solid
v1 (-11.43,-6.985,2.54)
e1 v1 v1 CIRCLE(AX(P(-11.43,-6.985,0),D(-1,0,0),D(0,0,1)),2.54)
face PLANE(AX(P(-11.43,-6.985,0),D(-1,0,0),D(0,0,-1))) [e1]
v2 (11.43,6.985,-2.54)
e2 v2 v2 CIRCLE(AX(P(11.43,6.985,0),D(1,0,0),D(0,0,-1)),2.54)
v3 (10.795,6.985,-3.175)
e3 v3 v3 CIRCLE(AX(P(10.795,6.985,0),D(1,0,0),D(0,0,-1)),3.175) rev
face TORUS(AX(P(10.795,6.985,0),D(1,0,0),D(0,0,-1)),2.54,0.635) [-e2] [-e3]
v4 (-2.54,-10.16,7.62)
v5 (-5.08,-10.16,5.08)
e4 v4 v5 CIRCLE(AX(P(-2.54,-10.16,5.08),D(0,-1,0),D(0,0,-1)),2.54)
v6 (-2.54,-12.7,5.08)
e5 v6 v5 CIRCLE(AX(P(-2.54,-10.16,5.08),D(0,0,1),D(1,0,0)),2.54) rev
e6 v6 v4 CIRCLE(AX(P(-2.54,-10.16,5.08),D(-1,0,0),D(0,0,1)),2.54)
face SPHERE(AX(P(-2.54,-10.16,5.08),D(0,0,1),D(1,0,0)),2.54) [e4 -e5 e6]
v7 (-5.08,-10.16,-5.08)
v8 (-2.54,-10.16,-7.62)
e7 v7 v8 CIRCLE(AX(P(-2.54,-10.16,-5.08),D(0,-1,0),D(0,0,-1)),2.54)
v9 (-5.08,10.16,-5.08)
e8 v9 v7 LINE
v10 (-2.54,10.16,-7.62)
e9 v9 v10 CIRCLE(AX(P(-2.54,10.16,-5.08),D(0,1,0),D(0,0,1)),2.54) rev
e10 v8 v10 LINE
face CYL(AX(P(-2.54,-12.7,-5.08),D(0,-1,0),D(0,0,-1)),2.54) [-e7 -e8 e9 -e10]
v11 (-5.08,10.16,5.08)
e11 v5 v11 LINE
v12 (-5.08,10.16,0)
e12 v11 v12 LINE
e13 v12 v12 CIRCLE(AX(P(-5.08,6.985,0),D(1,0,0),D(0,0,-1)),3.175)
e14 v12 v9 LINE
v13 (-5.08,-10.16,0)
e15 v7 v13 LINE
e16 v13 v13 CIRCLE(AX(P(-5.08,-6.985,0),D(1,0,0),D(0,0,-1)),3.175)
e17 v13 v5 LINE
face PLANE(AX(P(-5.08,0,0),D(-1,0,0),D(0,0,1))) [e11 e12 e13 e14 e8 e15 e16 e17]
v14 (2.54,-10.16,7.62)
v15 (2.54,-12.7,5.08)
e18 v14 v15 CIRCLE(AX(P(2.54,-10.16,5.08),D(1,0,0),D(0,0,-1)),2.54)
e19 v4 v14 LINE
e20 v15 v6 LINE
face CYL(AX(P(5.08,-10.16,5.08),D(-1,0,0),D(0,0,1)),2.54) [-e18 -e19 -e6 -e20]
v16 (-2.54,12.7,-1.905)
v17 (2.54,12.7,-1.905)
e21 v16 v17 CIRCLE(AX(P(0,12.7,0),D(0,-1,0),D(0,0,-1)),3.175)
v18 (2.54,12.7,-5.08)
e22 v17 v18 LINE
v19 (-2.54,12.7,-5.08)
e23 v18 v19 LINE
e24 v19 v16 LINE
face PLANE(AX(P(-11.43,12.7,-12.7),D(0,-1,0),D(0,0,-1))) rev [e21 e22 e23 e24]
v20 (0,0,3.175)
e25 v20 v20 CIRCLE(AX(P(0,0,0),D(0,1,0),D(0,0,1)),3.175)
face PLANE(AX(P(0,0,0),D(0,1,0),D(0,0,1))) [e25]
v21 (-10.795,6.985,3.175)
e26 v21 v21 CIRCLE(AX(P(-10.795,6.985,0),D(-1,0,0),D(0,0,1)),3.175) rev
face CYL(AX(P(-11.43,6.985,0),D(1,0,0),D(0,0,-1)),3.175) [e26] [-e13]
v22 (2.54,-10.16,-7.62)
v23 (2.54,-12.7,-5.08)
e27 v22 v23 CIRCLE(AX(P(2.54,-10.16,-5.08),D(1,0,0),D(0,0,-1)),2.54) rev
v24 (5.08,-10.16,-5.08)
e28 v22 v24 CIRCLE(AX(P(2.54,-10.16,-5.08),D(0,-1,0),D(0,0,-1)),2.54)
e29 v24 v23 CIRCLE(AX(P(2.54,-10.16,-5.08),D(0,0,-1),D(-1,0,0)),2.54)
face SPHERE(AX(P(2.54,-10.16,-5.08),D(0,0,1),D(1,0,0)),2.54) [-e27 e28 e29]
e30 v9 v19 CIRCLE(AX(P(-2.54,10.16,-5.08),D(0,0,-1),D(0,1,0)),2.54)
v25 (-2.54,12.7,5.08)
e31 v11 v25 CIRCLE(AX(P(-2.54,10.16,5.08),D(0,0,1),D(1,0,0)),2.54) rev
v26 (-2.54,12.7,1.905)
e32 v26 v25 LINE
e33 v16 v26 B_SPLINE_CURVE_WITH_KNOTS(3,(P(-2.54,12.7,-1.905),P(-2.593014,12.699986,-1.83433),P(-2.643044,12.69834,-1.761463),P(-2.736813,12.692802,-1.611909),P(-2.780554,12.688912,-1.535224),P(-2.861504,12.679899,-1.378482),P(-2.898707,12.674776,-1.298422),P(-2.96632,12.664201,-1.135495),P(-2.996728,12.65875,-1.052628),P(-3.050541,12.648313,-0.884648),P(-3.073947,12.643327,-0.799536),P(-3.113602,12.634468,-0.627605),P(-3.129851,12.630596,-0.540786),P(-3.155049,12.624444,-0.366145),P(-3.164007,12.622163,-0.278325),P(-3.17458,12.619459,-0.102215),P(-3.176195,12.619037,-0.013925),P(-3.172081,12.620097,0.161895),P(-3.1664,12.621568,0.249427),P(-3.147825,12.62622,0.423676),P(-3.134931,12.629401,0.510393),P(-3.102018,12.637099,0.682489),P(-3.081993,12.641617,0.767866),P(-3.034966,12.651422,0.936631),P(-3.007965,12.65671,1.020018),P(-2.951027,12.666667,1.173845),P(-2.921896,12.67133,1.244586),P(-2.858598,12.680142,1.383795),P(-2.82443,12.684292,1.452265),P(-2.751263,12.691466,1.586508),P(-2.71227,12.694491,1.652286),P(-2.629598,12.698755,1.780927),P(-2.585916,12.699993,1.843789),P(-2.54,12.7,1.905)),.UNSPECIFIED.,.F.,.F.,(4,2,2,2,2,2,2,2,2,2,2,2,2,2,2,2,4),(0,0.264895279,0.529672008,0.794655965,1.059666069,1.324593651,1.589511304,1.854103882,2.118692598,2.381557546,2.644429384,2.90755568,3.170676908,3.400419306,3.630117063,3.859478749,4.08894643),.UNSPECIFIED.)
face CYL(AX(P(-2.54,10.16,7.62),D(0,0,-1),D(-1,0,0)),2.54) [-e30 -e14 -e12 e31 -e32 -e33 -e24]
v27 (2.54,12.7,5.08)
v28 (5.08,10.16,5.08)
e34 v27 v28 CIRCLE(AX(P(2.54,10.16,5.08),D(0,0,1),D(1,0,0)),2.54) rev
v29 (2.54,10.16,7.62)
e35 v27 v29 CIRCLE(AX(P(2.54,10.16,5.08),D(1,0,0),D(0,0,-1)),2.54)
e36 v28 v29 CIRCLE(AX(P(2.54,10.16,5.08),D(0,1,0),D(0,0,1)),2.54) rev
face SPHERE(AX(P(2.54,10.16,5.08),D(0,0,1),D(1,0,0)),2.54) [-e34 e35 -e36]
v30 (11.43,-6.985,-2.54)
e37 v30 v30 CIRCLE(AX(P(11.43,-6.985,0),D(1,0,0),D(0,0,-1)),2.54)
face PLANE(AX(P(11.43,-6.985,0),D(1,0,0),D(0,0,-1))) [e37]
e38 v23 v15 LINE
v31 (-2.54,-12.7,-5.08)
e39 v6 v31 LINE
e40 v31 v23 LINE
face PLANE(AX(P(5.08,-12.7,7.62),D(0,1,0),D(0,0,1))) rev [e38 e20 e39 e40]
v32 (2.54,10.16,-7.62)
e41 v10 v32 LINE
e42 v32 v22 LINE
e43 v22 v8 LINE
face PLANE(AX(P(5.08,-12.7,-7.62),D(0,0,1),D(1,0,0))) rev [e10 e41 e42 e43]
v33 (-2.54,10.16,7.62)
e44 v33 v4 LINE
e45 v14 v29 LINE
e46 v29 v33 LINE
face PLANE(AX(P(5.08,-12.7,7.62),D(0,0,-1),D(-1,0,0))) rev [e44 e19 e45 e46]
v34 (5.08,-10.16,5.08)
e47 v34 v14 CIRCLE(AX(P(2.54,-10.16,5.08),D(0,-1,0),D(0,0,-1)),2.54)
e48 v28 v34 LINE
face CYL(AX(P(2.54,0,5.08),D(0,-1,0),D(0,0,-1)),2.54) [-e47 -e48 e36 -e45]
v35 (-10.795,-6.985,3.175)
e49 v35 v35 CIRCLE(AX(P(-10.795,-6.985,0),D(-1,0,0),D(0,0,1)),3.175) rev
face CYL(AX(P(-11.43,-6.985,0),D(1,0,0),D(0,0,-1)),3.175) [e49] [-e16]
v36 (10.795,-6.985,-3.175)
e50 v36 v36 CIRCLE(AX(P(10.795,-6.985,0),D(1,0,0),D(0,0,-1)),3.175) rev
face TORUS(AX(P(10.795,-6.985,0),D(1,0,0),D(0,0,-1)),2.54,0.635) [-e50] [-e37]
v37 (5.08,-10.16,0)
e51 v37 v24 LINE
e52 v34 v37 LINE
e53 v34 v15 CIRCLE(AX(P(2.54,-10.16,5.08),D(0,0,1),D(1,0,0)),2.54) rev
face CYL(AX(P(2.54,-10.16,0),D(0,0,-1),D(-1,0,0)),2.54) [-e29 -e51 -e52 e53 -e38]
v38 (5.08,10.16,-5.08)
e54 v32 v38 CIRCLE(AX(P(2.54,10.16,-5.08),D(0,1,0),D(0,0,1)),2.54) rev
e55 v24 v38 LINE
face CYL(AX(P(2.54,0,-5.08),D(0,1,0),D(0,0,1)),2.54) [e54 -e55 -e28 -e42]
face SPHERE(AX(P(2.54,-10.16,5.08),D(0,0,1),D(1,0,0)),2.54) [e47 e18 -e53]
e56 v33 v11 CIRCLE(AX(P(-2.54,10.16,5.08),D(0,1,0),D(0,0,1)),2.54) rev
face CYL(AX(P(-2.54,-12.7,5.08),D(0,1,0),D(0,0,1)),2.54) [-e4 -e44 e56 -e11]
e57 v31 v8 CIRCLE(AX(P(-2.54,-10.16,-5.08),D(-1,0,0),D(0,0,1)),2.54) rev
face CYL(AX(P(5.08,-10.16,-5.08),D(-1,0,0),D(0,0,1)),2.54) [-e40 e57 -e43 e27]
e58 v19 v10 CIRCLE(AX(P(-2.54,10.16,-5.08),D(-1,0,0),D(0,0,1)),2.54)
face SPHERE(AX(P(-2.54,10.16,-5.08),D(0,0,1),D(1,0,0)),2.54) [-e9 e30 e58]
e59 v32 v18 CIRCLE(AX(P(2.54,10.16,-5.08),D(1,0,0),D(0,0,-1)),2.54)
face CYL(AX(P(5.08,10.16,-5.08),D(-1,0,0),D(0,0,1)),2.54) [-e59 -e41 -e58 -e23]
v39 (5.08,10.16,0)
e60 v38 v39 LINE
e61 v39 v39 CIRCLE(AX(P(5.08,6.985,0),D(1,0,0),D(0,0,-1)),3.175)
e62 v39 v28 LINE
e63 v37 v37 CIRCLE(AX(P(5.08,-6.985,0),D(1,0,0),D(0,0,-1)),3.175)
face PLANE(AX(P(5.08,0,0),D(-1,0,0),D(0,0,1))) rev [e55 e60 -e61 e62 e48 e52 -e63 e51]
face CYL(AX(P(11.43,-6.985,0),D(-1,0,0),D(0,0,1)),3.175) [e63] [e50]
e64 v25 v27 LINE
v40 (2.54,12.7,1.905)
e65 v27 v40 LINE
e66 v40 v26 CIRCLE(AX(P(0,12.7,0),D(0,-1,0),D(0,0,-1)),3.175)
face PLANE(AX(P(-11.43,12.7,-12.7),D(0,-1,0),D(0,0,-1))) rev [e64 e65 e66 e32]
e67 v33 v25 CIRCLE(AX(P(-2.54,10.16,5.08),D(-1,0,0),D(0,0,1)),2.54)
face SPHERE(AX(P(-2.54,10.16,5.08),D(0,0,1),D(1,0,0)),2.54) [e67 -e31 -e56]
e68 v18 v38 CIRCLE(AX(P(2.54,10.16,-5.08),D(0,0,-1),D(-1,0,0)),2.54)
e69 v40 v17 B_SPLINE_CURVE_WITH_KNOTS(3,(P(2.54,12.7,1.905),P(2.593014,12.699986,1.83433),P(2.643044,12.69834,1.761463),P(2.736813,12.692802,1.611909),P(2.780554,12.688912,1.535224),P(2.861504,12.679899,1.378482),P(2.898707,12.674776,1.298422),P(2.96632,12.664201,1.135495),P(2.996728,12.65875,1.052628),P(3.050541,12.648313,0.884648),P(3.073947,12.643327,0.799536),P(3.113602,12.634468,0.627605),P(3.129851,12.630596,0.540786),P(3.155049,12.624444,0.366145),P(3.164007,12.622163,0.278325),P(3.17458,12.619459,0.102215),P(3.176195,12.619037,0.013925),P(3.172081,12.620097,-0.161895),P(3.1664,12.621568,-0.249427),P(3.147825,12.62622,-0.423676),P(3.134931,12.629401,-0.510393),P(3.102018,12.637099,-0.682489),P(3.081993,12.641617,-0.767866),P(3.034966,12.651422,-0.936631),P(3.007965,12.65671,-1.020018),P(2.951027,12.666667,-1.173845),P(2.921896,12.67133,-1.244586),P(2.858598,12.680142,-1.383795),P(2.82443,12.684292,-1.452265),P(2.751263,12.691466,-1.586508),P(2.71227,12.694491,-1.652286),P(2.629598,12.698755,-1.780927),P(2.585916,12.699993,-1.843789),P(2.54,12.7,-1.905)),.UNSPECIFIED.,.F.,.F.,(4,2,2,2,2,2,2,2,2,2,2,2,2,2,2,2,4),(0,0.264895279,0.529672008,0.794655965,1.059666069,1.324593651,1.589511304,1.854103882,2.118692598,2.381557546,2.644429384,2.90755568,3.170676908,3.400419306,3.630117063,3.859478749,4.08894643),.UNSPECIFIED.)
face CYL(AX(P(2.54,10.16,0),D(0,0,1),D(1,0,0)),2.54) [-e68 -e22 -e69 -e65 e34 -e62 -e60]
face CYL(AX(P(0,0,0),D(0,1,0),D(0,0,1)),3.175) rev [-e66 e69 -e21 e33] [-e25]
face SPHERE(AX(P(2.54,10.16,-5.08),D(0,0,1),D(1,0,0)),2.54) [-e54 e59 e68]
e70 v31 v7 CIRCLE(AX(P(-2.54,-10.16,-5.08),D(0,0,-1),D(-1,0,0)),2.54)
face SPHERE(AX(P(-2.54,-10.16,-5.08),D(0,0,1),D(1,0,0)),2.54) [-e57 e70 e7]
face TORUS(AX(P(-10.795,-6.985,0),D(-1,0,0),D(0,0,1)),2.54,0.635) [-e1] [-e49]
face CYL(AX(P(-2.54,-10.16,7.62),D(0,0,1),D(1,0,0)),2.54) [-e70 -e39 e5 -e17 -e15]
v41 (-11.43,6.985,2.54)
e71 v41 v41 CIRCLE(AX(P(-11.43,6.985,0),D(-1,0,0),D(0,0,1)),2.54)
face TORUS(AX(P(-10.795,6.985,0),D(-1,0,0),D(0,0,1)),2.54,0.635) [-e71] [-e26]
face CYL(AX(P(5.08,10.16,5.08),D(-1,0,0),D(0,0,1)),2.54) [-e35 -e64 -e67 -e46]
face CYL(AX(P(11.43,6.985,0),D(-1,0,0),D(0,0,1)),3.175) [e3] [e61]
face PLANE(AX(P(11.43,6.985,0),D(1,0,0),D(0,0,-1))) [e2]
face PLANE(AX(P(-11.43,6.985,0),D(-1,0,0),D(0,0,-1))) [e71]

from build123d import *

# Parameters (mm, degrees)
SKETCH1_W           = 15.24
SKETCH1_H           = 25.4
BOSS_EXTRUDE1_DEPTH = 5.08
FILLET1_R           = 2.54
SKETCH2_R           = 3.175
BOSS_EXTRUDE2_DEPTH = 6.35
SKETCH3_W           = 5.08
SKETCH3_H           = 10.16
BOSS_EXTRUDE3_DEPTH = 5.08
SKETCH4_W           = 7.62
SKETCH4_H           = 12.7
BOSS_EXTRUDE4_DEPTH = 25.4
FILLET2_R           = 2.54
FILLET3_R           = 3.81
SKETCH5_R           = 1.905
BOSS_EXTRUDE5_DEPTH = 1.27
BOSS_EXTRUDE6_DEPTH = 25.4
FILLET4_R           = 1.27
SKETCH7_W           = 5.588
SKETCH7_H           = 21.59
CUT_EXTRUDE1_DEPTH  = 1.016
FILLET5_R           = 0.254
CUT_EXTRUDE2_REACH  = 52.512
SKETCH8_R           = 4.445
FILLET6_R           = 0.635
SKETCH9_W           = 25.4
SKETCH9_H           = 50.8
CUT_EXTRUDE3_DEPTH  = 22.86
SKETCH10_R          = 3.175
CUT_EXTRUDE4_DEPTH  = 12.7


# Some blends are built 0.0001 mm under size
with BuildPart() as part:
    # Sketch1 → Boss-Extrude1 (new, symmetric)
    with BuildSketch(Plane(origin=(0, 0, 0), x_dir=(0, 0, -1), z_dir=(1, 0, 0))):
        Rectangle(SKETCH1_W, SKETCH1_H)
    extrude(amount=BOSS_EXTRUDE1_DEPTH, both=True)

    # Fillet1
    fillet1_edges = [part.edges().sort_by_distance(p)[0] for p in [
        (5.08, 0, 7.62),
        (5.08, -12.7, 0),
        (5.08, 0, -7.62),
        (-5.08, -12.7, 0),
        (-5.08, 0, 7.62),
        (-5.08, 12.7, 0),
        (-5.08, 0, -7.62),
        (5.08, 12.7, 0),
        (0, -12.7, -7.62),
        (0, -12.7, 7.62),
        (0, 12.7, 7.62),
        (0, 12.7, -7.62),
    ]]
    fillet(fillet1_edges, radius=FILLET1_R)

    # Sketch2 → Boss-Extrude2 (add)
    with BuildSketch(Plane(origin=(5.08, 0, 0), x_dir=(0, 0, -1), z_dir=(1, 0, 0))):
        with Locations(Location((0, 6.985, 0), (0, 0, 90))):
            Circle(SKETCH2_R)
        with Locations(Location((0, -6.985, 0), (0, 0, 270))):
            Circle(SKETCH2_R)
    boss_extrude2 = extrude(amount=BOSS_EXTRUDE2_DEPTH)

    # Mirror1: Boss-Extrude2 across plane
    add(boss_extrude2.mirror(Plane(origin=(0, 0, 0), x_dir=(0, 0, 1), z_dir=(1, 0, 0))))

    # Sketch3 → Boss-Extrude3 (add)
    with BuildSketch(Plane(origin=(0, 12.7, 0), x_dir=(1, 0, 0), z_dir=(0, 1, 0))):
        Rectangle(SKETCH3_W, SKETCH3_H)
    extrude(amount=BOSS_EXTRUDE3_DEPTH)

    # Sketch4 → Boss-Extrude4 (add)
    with BuildSketch(Plane(origin=(0, 17.78, 0), x_dir=(1, 0, 0), z_dir=(0, 1, 0))):
        Rectangle(SKETCH4_W, SKETCH4_H)
    extrude(amount=BOSS_EXTRUDE4_DEPTH)

    # Fillet2
    # the kernel refuses this fillet: 2.54 mm, written as the material it takes off along each edge
    with BuildSketch(Plane(origin=(10.16, 17.78, -6.35), x_dir=(0, 0, 1), z_dir=(-1, 0, 0))) as fillet2_piece_1_section:
        with BuildLine():
            CenterArc((FILLET2_R, FILLET2_R), FILLET2_R, 180, 90)
            Line((0, FILLET2_R), (0, 0))
            Line((0, 0), (FILLET2_R, 0))
        make_face()
    fillet2_piece_1 = extrude(amount=20.32, mode=Mode.PRIVATE)
    fillet2_piece_1 = split(fillet2_piece_1, bisect_by=Plane(origin=(6.35, 17.840981289, -5.08), z_dir=(0, 0, 1)), keep=Keep.TOP, mode=Mode.PRIVATE)
    fillet2_piece_1 = split(fillet2_piece_1, bisect_by=Plane(origin=(2.54, 17.840981289, -4.665343007), z_dir=(1, 0, 0)), keep=Keep.TOP, mode=Mode.PRIVATE)
    add(fillet2_piece_1, mode=Mode.SUBTRACT)
    with BuildSketch(Plane(origin=(10.16, 17.78, -6.35), x_dir=(0, 0, 1), z_dir=(-1, 0, 0))) as fillet2_piece_2_section:
        with BuildLine():
            CenterArc((FILLET2_R, FILLET2_R), FILLET2_R, 180, 90)
            Line((0, FILLET2_R), (0, 0))
            Line((0, 0), (FILLET2_R, 0))
        make_face()
    fillet2_piece_2 = extrude(amount=20.32, mode=Mode.PRIVATE)
    fillet2_piece_2 = split(fillet2_piece_2, bisect_by=Plane(origin=(6.35, 18.428004952, -5.08), z_dir=(0, 0, -1)), keep=Keep.TOP, mode=Mode.PRIVATE)
    fillet2_piece_2 = split(fillet2_piece_2, bisect_by=Plane(origin=(2.54, 18.428004952, -5.932444919), z_dir=(1, 0, 0)), keep=Keep.TOP, mode=Mode.PRIVATE)
    add(fillet2_piece_2, mode=Mode.SUBTRACT)
    with BuildSketch(Plane(origin=(10.16, 17.78, -6.35), x_dir=(0, 0, 1), z_dir=(-1, 0, 0))) as fillet2_piece_3_section:
        with BuildLine():
            CenterArc((FILLET2_R, FILLET2_R), FILLET2_R, 180, 90)
            Line((0, FILLET2_R), (0, 0))
            Line((0, 0), (FILLET2_R, 0))
        make_face()
    fillet2_piece_3 = extrude(amount=20.32, mode=Mode.PRIVATE)
    fillet2_piece_3 = split(fillet2_piece_3, bisect_by=Plane(origin=(0, 18.428004952, -5.08), z_dir=(0, 0, -1)), keep=Keep.TOP, mode=Mode.PRIVATE)
    fillet2_piece_3 = split(fillet2_piece_3, bisect_by=Plane(origin=(-2.54, 18.428004952, -5.932444919), z_dir=(1, 0, 0)), keep=Keep.TOP, mode=Mode.PRIVATE)
    fillet2_piece_3 = split(fillet2_piece_3, bisect_by=Plane(origin=(2.54, 18.428004952, -5.932444919), z_dir=(-1, 0, 0)), keep=Keep.TOP, mode=Mode.PRIVATE)
    add(fillet2_piece_3, mode=Mode.SUBTRACT)
    with BuildSketch(Plane(origin=(10.16, 17.78, -6.35), x_dir=(0, 0, 1), z_dir=(-1, 0, 0))) as fillet2_piece_4_section:
        with BuildLine():
            CenterArc((FILLET2_R, FILLET2_R), FILLET2_R, 180, 90)
            Line((0, FILLET2_R), (0, 0))
            Line((0, 0), (FILLET2_R, 0))
        make_face()
    fillet2_piece_4 = extrude(amount=20.32, mode=Mode.PRIVATE)
    fillet2_piece_4 = split(fillet2_piece_4, bisect_by=Plane(origin=(-6.35, 17.840981289, -5.08), z_dir=(0, 0, 1)), keep=Keep.TOP, mode=Mode.PRIVATE)
    fillet2_piece_4 = split(fillet2_piece_4, bisect_by=Plane(origin=(-2.54, 17.840981289, -4.665343007), z_dir=(-1, 0, 0)), keep=Keep.TOP, mode=Mode.PRIVATE)
    add(fillet2_piece_4, mode=Mode.SUBTRACT)
    with BuildSketch(Plane(origin=(10.16, 17.78, -6.35), x_dir=(0, 0, 1), z_dir=(-1, 0, 0))) as fillet2_piece_5_section:
        with BuildLine():
            CenterArc((FILLET2_R, FILLET2_R), FILLET2_R, 180, 90)
            Line((0, FILLET2_R), (0, 0))
            Line((0, 0), (FILLET2_R, 0))
        make_face()
    fillet2_piece_5 = extrude(amount=20.32, mode=Mode.PRIVATE)
    fillet2_piece_5 = split(fillet2_piece_5, bisect_by=Plane(origin=(-6.35, 18.428004952, -5.08), z_dir=(0, 0, -1)), keep=Keep.TOP, mode=Mode.PRIVATE)
    fillet2_piece_5 = split(fillet2_piece_5, bisect_by=Plane(origin=(-2.54, 18.428004952, -5.932444919), z_dir=(-1, 0, 0)), keep=Keep.TOP, mode=Mode.PRIVATE)
    add(fillet2_piece_5, mode=Mode.SUBTRACT)
    with BuildSketch(Plane(origin=(-10.16, 17.78, 6.35), x_dir=(0, 1, 0), z_dir=(1, 0, 0))) as fillet2_piece_6_section:
        with BuildLine():
            CenterArc((FILLET2_R, -FILLET2_R), FILLET2_R, 90, 90)
            Line((0, -FILLET2_R), (0, 0))
            Line((0, 0), (FILLET2_R, 0))
        make_face()
    fillet2_piece_6 = extrude(amount=20.32, mode=Mode.PRIVATE)
    fillet2_piece_6 = split(fillet2_piece_6, bisect_by=Plane(origin=(-2.54, 18.428004952, 5.932444919), z_dir=(-1, 0, 0)), keep=Keep.TOP, mode=Mode.PRIVATE)
    fillet2_piece_6 = split(fillet2_piece_6, bisect_by=Plane(origin=(-6.35, 18.428004952, 5.08), z_dir=(0, 0, 1)), keep=Keep.TOP, mode=Mode.PRIVATE)
    add(fillet2_piece_6, mode=Mode.SUBTRACT)
    with BuildSketch(Plane(origin=(-10.16, 17.78, 6.35), x_dir=(0, 1, 0), z_dir=(1, 0, 0))) as fillet2_piece_7_section:
        with BuildLine():
            CenterArc((FILLET2_R, -FILLET2_R), FILLET2_R, 90, 90)
            Line((0, -FILLET2_R), (0, 0))
            Line((0, 0), (FILLET2_R, 0))
        make_face()
    fillet2_piece_7 = extrude(amount=20.32, mode=Mode.PRIVATE)
    fillet2_piece_7 = split(fillet2_piece_7, bisect_by=Plane(origin=(-2.54, 17.840981289, 4.665343007), z_dir=(-1, 0, 0)), keep=Keep.TOP, mode=Mode.PRIVATE)
    fillet2_piece_7 = split(fillet2_piece_7, bisect_by=Plane(origin=(-6.35, 17.840981289, 5.08), z_dir=(0, 0, -1)), keep=Keep.TOP, mode=Mode.PRIVATE)
    add(fillet2_piece_7, mode=Mode.SUBTRACT)
    with BuildSketch(Plane(origin=(-10.16, 17.78, 6.35), x_dir=(0, 1, 0), z_dir=(1, 0, 0))) as fillet2_piece_8_section:
        with BuildLine():
            CenterArc((FILLET2_R, -FILLET2_R), FILLET2_R, 90, 90)
            Line((0, -FILLET2_R), (0, 0))
            Line((0, 0), (FILLET2_R, 0))
        make_face()
    fillet2_piece_8 = extrude(amount=20.32, mode=Mode.PRIVATE)
    fillet2_piece_8 = split(fillet2_piece_8, bisect_by=Plane(origin=(-2.54, 18.428004952, 5.932444919), z_dir=(1, 0, 0)), keep=Keep.TOP, mode=Mode.PRIVATE)
    fillet2_piece_8 = split(fillet2_piece_8, bisect_by=Plane(origin=(0, 18.428004952, 5.08), z_dir=(0, 0, 1)), keep=Keep.TOP, mode=Mode.PRIVATE)
    fillet2_piece_8 = split(fillet2_piece_8, bisect_by=Plane(origin=(2.54, 18.428004952, 5.932444919), z_dir=(-1, 0, 0)), keep=Keep.TOP, mode=Mode.PRIVATE)
    add(fillet2_piece_8, mode=Mode.SUBTRACT)
    with BuildSketch(Plane(origin=(-10.16, 17.78, 6.35), x_dir=(0, 1, 0), z_dir=(1, 0, 0))) as fillet2_piece_9_section:
        with BuildLine():
            CenterArc((FILLET2_R, -FILLET2_R), FILLET2_R, 90, 90)
            Line((0, -FILLET2_R), (0, 0))
            Line((0, 0), (FILLET2_R, 0))
        make_face()
    fillet2_piece_9 = extrude(amount=20.32, mode=Mode.PRIVATE)
    fillet2_piece_9 = split(fillet2_piece_9, bisect_by=Plane(origin=(6.35, 18.428004952, 5.08), z_dir=(0, 0, 1)), keep=Keep.TOP, mode=Mode.PRIVATE)
    fillet2_piece_9 = split(fillet2_piece_9, bisect_by=Plane(origin=(2.54, 18.428004952, 5.932444919), z_dir=(1, 0, 0)), keep=Keep.TOP, mode=Mode.PRIVATE)
    add(fillet2_piece_9, mode=Mode.SUBTRACT)
    with BuildSketch(Plane(origin=(-10.16, 17.78, 6.35), x_dir=(0, 1, 0), z_dir=(1, 0, 0))) as fillet2_piece_10_section:
        with BuildLine():
            CenterArc((FILLET2_R, -FILLET2_R), FILLET2_R, 90, 90)
            Line((0, -FILLET2_R), (0, 0))
            Line((0, 0), (FILLET2_R, 0))
        make_face()
    fillet2_piece_10 = extrude(amount=20.32, mode=Mode.PRIVATE)
    fillet2_piece_10 = split(fillet2_piece_10, bisect_by=Plane(origin=(6.35, 17.840981289, 5.08), z_dir=(0, 0, -1)), keep=Keep.TOP, mode=Mode.PRIVATE)
    fillet2_piece_10 = split(fillet2_piece_10, bisect_by=Plane(origin=(2.54, 17.840981289, 4.665343007), z_dir=(1, 0, 0)), keep=Keep.TOP, mode=Mode.PRIVATE)
    add(fillet2_piece_10, mode=Mode.SUBTRACT)

    # Fillet3
    fillet3_edges = [part.edges().sort_by_distance(p)[0] for p in [
        (3.81, 43.18, 0),
        (0, 43.18, -6.35),
        (-3.81, 43.18, 0),
        (0, 43.18, 6.35),
    ]]
    fillet(fillet3_edges, radius=FILLET3_R - 0.0001)  # a hair under: the kernel refuses the full size

    # Sketch5 → Boss-Extrude5 (add)
    with BuildSketch(Plane(origin=(0, 0, -6.35), x_dir=(-1, 0, 0), z_dir=(0, 0, -1))):
        with Locations(Location((0, 32.385, 0), (0, 0, 180))):
            Circle(SKETCH5_R)
        with Locations(Location((0, 25.4, 0), (0, 0, 180))):
            Circle(SKETCH5_R)
    extrude(amount=BOSS_EXTRUDE5_DEPTH)

    # Sketch6 → Boss-Extrude6 (add)
    with BuildSketch(Plane(origin=(0, 21.59, 0), x_dir=(1, 0, 0), z_dir=(0, 1, 0))):
        with BuildLine():
            Line((-3.81, 10.541), (3.81, 10.541))
            ThreePointArc((3.81, 10.541), (5.588, 8.763), (3.81, 6.985))
            Line((3.81, 6.985), (-3.81, 6.985))
            ThreePointArc((-3.81, 6.985), (-5.588, 8.763), (-3.81, 10.541))
        make_face()
    extrude(amount=BOSS_EXTRUDE6_DEPTH)

    # Fillet4
    fillet4_edges = [part.edges().sort_by_distance(p)[0] for p in [
        (0, 21.59, -6.985),
        (-5.588, 21.59, -8.763),
        (5.588, 21.59, -8.763),
        (0, 21.59, -10.541),
        (-5.588, 46.99, -8.763),
        (0, 46.99, -6.985),
        (5.588, 46.99, -8.763),
        (0, 46.99, -10.541),
    ]]
    fillet(fillet4_edges, radius=FILLET4_R)

    # Sketch7 → Cut-Extrude1 (cut)
    with BuildSketch(Plane(origin=(0, 0, -10.541), x_dir=(-1, 0, 0), z_dir=(0, 0, -1))):
        with Locations((0, 34.29)):
            Rectangle(SKETCH7_W, SKETCH7_H)
    extrude(amount=-CUT_EXTRUDE1_DEPTH, mode=Mode.SUBTRACT)

    # Fillet5
    fillet5_edges = [part.edges().sort_by_distance(p)[0] for p in [
        (-2.794, 34.29, -10.541),
        (0, 45.085, -10.541),
        (2.794, 34.29, -10.541),
        (0, 23.495, -10.541),
    ]]
    fillet(fillet5_edges, radius=FILLET5_R)

    # Sketch8 → Cut-Extrude2 (cut, up to next)
    with BuildSketch(Plane(origin=(3.81, 0, 0), x_dir=(0, 0, -1), z_dir=(1, 0, 0)), mode=Mode.PRIVATE) as cut_extrude2_sk1:
        with Locations((0, 33.02)):
            Circle(SKETCH8_R)
    cut_extrude2_tool1 = extrude(cut_extrude2_sk1.sketch, amount=-CUT_EXTRUDE2_REACH, mode=Mode.PRIVATE) & part.part
    add(cut_extrude2_tool1.solids().sort_by_distance((3.81, 33.02, 0))[0], mode=Mode.SUBTRACT)

    # Fillet6
    fillet6_edges = [part.edges().sort_by_distance(p)[0] for p in [
        (11.43, 3.81, 0),
        (11.43, -3.81, 0),
        (-11.43, 3.81, 0),
        (-11.43, -3.81, 0),
    ]]
    fillet(fillet6_edges, radius=FILLET6_R)

    # Sketch9 → Cut-Extrude3 (cut)
    with BuildSketch(Plane(origin=(11.43, 0, 0), x_dir=(0, 0, -1), z_dir=(1, 0, 0))):
        with Locations((0, 38.1)):
            Rectangle(SKETCH9_W, SKETCH9_H)
    extrude(amount=-CUT_EXTRUDE3_DEPTH, mode=Mode.SUBTRACT)

    # Sketch10 → Cut-Extrude4 (cut)
    with BuildSketch(Plane(origin=(0, 12.7, 0), x_dir=(1, 0, 0), z_dir=(0, 1, 0))):
        with Locations(Location((0, 0, 0), (0, 0, 270))):
            Circle(SKETCH10_R)
    extrude(amount=-CUT_EXTRUDE4_DEPTH, mode=Mode.SUBTRACT)


solid = part.part
